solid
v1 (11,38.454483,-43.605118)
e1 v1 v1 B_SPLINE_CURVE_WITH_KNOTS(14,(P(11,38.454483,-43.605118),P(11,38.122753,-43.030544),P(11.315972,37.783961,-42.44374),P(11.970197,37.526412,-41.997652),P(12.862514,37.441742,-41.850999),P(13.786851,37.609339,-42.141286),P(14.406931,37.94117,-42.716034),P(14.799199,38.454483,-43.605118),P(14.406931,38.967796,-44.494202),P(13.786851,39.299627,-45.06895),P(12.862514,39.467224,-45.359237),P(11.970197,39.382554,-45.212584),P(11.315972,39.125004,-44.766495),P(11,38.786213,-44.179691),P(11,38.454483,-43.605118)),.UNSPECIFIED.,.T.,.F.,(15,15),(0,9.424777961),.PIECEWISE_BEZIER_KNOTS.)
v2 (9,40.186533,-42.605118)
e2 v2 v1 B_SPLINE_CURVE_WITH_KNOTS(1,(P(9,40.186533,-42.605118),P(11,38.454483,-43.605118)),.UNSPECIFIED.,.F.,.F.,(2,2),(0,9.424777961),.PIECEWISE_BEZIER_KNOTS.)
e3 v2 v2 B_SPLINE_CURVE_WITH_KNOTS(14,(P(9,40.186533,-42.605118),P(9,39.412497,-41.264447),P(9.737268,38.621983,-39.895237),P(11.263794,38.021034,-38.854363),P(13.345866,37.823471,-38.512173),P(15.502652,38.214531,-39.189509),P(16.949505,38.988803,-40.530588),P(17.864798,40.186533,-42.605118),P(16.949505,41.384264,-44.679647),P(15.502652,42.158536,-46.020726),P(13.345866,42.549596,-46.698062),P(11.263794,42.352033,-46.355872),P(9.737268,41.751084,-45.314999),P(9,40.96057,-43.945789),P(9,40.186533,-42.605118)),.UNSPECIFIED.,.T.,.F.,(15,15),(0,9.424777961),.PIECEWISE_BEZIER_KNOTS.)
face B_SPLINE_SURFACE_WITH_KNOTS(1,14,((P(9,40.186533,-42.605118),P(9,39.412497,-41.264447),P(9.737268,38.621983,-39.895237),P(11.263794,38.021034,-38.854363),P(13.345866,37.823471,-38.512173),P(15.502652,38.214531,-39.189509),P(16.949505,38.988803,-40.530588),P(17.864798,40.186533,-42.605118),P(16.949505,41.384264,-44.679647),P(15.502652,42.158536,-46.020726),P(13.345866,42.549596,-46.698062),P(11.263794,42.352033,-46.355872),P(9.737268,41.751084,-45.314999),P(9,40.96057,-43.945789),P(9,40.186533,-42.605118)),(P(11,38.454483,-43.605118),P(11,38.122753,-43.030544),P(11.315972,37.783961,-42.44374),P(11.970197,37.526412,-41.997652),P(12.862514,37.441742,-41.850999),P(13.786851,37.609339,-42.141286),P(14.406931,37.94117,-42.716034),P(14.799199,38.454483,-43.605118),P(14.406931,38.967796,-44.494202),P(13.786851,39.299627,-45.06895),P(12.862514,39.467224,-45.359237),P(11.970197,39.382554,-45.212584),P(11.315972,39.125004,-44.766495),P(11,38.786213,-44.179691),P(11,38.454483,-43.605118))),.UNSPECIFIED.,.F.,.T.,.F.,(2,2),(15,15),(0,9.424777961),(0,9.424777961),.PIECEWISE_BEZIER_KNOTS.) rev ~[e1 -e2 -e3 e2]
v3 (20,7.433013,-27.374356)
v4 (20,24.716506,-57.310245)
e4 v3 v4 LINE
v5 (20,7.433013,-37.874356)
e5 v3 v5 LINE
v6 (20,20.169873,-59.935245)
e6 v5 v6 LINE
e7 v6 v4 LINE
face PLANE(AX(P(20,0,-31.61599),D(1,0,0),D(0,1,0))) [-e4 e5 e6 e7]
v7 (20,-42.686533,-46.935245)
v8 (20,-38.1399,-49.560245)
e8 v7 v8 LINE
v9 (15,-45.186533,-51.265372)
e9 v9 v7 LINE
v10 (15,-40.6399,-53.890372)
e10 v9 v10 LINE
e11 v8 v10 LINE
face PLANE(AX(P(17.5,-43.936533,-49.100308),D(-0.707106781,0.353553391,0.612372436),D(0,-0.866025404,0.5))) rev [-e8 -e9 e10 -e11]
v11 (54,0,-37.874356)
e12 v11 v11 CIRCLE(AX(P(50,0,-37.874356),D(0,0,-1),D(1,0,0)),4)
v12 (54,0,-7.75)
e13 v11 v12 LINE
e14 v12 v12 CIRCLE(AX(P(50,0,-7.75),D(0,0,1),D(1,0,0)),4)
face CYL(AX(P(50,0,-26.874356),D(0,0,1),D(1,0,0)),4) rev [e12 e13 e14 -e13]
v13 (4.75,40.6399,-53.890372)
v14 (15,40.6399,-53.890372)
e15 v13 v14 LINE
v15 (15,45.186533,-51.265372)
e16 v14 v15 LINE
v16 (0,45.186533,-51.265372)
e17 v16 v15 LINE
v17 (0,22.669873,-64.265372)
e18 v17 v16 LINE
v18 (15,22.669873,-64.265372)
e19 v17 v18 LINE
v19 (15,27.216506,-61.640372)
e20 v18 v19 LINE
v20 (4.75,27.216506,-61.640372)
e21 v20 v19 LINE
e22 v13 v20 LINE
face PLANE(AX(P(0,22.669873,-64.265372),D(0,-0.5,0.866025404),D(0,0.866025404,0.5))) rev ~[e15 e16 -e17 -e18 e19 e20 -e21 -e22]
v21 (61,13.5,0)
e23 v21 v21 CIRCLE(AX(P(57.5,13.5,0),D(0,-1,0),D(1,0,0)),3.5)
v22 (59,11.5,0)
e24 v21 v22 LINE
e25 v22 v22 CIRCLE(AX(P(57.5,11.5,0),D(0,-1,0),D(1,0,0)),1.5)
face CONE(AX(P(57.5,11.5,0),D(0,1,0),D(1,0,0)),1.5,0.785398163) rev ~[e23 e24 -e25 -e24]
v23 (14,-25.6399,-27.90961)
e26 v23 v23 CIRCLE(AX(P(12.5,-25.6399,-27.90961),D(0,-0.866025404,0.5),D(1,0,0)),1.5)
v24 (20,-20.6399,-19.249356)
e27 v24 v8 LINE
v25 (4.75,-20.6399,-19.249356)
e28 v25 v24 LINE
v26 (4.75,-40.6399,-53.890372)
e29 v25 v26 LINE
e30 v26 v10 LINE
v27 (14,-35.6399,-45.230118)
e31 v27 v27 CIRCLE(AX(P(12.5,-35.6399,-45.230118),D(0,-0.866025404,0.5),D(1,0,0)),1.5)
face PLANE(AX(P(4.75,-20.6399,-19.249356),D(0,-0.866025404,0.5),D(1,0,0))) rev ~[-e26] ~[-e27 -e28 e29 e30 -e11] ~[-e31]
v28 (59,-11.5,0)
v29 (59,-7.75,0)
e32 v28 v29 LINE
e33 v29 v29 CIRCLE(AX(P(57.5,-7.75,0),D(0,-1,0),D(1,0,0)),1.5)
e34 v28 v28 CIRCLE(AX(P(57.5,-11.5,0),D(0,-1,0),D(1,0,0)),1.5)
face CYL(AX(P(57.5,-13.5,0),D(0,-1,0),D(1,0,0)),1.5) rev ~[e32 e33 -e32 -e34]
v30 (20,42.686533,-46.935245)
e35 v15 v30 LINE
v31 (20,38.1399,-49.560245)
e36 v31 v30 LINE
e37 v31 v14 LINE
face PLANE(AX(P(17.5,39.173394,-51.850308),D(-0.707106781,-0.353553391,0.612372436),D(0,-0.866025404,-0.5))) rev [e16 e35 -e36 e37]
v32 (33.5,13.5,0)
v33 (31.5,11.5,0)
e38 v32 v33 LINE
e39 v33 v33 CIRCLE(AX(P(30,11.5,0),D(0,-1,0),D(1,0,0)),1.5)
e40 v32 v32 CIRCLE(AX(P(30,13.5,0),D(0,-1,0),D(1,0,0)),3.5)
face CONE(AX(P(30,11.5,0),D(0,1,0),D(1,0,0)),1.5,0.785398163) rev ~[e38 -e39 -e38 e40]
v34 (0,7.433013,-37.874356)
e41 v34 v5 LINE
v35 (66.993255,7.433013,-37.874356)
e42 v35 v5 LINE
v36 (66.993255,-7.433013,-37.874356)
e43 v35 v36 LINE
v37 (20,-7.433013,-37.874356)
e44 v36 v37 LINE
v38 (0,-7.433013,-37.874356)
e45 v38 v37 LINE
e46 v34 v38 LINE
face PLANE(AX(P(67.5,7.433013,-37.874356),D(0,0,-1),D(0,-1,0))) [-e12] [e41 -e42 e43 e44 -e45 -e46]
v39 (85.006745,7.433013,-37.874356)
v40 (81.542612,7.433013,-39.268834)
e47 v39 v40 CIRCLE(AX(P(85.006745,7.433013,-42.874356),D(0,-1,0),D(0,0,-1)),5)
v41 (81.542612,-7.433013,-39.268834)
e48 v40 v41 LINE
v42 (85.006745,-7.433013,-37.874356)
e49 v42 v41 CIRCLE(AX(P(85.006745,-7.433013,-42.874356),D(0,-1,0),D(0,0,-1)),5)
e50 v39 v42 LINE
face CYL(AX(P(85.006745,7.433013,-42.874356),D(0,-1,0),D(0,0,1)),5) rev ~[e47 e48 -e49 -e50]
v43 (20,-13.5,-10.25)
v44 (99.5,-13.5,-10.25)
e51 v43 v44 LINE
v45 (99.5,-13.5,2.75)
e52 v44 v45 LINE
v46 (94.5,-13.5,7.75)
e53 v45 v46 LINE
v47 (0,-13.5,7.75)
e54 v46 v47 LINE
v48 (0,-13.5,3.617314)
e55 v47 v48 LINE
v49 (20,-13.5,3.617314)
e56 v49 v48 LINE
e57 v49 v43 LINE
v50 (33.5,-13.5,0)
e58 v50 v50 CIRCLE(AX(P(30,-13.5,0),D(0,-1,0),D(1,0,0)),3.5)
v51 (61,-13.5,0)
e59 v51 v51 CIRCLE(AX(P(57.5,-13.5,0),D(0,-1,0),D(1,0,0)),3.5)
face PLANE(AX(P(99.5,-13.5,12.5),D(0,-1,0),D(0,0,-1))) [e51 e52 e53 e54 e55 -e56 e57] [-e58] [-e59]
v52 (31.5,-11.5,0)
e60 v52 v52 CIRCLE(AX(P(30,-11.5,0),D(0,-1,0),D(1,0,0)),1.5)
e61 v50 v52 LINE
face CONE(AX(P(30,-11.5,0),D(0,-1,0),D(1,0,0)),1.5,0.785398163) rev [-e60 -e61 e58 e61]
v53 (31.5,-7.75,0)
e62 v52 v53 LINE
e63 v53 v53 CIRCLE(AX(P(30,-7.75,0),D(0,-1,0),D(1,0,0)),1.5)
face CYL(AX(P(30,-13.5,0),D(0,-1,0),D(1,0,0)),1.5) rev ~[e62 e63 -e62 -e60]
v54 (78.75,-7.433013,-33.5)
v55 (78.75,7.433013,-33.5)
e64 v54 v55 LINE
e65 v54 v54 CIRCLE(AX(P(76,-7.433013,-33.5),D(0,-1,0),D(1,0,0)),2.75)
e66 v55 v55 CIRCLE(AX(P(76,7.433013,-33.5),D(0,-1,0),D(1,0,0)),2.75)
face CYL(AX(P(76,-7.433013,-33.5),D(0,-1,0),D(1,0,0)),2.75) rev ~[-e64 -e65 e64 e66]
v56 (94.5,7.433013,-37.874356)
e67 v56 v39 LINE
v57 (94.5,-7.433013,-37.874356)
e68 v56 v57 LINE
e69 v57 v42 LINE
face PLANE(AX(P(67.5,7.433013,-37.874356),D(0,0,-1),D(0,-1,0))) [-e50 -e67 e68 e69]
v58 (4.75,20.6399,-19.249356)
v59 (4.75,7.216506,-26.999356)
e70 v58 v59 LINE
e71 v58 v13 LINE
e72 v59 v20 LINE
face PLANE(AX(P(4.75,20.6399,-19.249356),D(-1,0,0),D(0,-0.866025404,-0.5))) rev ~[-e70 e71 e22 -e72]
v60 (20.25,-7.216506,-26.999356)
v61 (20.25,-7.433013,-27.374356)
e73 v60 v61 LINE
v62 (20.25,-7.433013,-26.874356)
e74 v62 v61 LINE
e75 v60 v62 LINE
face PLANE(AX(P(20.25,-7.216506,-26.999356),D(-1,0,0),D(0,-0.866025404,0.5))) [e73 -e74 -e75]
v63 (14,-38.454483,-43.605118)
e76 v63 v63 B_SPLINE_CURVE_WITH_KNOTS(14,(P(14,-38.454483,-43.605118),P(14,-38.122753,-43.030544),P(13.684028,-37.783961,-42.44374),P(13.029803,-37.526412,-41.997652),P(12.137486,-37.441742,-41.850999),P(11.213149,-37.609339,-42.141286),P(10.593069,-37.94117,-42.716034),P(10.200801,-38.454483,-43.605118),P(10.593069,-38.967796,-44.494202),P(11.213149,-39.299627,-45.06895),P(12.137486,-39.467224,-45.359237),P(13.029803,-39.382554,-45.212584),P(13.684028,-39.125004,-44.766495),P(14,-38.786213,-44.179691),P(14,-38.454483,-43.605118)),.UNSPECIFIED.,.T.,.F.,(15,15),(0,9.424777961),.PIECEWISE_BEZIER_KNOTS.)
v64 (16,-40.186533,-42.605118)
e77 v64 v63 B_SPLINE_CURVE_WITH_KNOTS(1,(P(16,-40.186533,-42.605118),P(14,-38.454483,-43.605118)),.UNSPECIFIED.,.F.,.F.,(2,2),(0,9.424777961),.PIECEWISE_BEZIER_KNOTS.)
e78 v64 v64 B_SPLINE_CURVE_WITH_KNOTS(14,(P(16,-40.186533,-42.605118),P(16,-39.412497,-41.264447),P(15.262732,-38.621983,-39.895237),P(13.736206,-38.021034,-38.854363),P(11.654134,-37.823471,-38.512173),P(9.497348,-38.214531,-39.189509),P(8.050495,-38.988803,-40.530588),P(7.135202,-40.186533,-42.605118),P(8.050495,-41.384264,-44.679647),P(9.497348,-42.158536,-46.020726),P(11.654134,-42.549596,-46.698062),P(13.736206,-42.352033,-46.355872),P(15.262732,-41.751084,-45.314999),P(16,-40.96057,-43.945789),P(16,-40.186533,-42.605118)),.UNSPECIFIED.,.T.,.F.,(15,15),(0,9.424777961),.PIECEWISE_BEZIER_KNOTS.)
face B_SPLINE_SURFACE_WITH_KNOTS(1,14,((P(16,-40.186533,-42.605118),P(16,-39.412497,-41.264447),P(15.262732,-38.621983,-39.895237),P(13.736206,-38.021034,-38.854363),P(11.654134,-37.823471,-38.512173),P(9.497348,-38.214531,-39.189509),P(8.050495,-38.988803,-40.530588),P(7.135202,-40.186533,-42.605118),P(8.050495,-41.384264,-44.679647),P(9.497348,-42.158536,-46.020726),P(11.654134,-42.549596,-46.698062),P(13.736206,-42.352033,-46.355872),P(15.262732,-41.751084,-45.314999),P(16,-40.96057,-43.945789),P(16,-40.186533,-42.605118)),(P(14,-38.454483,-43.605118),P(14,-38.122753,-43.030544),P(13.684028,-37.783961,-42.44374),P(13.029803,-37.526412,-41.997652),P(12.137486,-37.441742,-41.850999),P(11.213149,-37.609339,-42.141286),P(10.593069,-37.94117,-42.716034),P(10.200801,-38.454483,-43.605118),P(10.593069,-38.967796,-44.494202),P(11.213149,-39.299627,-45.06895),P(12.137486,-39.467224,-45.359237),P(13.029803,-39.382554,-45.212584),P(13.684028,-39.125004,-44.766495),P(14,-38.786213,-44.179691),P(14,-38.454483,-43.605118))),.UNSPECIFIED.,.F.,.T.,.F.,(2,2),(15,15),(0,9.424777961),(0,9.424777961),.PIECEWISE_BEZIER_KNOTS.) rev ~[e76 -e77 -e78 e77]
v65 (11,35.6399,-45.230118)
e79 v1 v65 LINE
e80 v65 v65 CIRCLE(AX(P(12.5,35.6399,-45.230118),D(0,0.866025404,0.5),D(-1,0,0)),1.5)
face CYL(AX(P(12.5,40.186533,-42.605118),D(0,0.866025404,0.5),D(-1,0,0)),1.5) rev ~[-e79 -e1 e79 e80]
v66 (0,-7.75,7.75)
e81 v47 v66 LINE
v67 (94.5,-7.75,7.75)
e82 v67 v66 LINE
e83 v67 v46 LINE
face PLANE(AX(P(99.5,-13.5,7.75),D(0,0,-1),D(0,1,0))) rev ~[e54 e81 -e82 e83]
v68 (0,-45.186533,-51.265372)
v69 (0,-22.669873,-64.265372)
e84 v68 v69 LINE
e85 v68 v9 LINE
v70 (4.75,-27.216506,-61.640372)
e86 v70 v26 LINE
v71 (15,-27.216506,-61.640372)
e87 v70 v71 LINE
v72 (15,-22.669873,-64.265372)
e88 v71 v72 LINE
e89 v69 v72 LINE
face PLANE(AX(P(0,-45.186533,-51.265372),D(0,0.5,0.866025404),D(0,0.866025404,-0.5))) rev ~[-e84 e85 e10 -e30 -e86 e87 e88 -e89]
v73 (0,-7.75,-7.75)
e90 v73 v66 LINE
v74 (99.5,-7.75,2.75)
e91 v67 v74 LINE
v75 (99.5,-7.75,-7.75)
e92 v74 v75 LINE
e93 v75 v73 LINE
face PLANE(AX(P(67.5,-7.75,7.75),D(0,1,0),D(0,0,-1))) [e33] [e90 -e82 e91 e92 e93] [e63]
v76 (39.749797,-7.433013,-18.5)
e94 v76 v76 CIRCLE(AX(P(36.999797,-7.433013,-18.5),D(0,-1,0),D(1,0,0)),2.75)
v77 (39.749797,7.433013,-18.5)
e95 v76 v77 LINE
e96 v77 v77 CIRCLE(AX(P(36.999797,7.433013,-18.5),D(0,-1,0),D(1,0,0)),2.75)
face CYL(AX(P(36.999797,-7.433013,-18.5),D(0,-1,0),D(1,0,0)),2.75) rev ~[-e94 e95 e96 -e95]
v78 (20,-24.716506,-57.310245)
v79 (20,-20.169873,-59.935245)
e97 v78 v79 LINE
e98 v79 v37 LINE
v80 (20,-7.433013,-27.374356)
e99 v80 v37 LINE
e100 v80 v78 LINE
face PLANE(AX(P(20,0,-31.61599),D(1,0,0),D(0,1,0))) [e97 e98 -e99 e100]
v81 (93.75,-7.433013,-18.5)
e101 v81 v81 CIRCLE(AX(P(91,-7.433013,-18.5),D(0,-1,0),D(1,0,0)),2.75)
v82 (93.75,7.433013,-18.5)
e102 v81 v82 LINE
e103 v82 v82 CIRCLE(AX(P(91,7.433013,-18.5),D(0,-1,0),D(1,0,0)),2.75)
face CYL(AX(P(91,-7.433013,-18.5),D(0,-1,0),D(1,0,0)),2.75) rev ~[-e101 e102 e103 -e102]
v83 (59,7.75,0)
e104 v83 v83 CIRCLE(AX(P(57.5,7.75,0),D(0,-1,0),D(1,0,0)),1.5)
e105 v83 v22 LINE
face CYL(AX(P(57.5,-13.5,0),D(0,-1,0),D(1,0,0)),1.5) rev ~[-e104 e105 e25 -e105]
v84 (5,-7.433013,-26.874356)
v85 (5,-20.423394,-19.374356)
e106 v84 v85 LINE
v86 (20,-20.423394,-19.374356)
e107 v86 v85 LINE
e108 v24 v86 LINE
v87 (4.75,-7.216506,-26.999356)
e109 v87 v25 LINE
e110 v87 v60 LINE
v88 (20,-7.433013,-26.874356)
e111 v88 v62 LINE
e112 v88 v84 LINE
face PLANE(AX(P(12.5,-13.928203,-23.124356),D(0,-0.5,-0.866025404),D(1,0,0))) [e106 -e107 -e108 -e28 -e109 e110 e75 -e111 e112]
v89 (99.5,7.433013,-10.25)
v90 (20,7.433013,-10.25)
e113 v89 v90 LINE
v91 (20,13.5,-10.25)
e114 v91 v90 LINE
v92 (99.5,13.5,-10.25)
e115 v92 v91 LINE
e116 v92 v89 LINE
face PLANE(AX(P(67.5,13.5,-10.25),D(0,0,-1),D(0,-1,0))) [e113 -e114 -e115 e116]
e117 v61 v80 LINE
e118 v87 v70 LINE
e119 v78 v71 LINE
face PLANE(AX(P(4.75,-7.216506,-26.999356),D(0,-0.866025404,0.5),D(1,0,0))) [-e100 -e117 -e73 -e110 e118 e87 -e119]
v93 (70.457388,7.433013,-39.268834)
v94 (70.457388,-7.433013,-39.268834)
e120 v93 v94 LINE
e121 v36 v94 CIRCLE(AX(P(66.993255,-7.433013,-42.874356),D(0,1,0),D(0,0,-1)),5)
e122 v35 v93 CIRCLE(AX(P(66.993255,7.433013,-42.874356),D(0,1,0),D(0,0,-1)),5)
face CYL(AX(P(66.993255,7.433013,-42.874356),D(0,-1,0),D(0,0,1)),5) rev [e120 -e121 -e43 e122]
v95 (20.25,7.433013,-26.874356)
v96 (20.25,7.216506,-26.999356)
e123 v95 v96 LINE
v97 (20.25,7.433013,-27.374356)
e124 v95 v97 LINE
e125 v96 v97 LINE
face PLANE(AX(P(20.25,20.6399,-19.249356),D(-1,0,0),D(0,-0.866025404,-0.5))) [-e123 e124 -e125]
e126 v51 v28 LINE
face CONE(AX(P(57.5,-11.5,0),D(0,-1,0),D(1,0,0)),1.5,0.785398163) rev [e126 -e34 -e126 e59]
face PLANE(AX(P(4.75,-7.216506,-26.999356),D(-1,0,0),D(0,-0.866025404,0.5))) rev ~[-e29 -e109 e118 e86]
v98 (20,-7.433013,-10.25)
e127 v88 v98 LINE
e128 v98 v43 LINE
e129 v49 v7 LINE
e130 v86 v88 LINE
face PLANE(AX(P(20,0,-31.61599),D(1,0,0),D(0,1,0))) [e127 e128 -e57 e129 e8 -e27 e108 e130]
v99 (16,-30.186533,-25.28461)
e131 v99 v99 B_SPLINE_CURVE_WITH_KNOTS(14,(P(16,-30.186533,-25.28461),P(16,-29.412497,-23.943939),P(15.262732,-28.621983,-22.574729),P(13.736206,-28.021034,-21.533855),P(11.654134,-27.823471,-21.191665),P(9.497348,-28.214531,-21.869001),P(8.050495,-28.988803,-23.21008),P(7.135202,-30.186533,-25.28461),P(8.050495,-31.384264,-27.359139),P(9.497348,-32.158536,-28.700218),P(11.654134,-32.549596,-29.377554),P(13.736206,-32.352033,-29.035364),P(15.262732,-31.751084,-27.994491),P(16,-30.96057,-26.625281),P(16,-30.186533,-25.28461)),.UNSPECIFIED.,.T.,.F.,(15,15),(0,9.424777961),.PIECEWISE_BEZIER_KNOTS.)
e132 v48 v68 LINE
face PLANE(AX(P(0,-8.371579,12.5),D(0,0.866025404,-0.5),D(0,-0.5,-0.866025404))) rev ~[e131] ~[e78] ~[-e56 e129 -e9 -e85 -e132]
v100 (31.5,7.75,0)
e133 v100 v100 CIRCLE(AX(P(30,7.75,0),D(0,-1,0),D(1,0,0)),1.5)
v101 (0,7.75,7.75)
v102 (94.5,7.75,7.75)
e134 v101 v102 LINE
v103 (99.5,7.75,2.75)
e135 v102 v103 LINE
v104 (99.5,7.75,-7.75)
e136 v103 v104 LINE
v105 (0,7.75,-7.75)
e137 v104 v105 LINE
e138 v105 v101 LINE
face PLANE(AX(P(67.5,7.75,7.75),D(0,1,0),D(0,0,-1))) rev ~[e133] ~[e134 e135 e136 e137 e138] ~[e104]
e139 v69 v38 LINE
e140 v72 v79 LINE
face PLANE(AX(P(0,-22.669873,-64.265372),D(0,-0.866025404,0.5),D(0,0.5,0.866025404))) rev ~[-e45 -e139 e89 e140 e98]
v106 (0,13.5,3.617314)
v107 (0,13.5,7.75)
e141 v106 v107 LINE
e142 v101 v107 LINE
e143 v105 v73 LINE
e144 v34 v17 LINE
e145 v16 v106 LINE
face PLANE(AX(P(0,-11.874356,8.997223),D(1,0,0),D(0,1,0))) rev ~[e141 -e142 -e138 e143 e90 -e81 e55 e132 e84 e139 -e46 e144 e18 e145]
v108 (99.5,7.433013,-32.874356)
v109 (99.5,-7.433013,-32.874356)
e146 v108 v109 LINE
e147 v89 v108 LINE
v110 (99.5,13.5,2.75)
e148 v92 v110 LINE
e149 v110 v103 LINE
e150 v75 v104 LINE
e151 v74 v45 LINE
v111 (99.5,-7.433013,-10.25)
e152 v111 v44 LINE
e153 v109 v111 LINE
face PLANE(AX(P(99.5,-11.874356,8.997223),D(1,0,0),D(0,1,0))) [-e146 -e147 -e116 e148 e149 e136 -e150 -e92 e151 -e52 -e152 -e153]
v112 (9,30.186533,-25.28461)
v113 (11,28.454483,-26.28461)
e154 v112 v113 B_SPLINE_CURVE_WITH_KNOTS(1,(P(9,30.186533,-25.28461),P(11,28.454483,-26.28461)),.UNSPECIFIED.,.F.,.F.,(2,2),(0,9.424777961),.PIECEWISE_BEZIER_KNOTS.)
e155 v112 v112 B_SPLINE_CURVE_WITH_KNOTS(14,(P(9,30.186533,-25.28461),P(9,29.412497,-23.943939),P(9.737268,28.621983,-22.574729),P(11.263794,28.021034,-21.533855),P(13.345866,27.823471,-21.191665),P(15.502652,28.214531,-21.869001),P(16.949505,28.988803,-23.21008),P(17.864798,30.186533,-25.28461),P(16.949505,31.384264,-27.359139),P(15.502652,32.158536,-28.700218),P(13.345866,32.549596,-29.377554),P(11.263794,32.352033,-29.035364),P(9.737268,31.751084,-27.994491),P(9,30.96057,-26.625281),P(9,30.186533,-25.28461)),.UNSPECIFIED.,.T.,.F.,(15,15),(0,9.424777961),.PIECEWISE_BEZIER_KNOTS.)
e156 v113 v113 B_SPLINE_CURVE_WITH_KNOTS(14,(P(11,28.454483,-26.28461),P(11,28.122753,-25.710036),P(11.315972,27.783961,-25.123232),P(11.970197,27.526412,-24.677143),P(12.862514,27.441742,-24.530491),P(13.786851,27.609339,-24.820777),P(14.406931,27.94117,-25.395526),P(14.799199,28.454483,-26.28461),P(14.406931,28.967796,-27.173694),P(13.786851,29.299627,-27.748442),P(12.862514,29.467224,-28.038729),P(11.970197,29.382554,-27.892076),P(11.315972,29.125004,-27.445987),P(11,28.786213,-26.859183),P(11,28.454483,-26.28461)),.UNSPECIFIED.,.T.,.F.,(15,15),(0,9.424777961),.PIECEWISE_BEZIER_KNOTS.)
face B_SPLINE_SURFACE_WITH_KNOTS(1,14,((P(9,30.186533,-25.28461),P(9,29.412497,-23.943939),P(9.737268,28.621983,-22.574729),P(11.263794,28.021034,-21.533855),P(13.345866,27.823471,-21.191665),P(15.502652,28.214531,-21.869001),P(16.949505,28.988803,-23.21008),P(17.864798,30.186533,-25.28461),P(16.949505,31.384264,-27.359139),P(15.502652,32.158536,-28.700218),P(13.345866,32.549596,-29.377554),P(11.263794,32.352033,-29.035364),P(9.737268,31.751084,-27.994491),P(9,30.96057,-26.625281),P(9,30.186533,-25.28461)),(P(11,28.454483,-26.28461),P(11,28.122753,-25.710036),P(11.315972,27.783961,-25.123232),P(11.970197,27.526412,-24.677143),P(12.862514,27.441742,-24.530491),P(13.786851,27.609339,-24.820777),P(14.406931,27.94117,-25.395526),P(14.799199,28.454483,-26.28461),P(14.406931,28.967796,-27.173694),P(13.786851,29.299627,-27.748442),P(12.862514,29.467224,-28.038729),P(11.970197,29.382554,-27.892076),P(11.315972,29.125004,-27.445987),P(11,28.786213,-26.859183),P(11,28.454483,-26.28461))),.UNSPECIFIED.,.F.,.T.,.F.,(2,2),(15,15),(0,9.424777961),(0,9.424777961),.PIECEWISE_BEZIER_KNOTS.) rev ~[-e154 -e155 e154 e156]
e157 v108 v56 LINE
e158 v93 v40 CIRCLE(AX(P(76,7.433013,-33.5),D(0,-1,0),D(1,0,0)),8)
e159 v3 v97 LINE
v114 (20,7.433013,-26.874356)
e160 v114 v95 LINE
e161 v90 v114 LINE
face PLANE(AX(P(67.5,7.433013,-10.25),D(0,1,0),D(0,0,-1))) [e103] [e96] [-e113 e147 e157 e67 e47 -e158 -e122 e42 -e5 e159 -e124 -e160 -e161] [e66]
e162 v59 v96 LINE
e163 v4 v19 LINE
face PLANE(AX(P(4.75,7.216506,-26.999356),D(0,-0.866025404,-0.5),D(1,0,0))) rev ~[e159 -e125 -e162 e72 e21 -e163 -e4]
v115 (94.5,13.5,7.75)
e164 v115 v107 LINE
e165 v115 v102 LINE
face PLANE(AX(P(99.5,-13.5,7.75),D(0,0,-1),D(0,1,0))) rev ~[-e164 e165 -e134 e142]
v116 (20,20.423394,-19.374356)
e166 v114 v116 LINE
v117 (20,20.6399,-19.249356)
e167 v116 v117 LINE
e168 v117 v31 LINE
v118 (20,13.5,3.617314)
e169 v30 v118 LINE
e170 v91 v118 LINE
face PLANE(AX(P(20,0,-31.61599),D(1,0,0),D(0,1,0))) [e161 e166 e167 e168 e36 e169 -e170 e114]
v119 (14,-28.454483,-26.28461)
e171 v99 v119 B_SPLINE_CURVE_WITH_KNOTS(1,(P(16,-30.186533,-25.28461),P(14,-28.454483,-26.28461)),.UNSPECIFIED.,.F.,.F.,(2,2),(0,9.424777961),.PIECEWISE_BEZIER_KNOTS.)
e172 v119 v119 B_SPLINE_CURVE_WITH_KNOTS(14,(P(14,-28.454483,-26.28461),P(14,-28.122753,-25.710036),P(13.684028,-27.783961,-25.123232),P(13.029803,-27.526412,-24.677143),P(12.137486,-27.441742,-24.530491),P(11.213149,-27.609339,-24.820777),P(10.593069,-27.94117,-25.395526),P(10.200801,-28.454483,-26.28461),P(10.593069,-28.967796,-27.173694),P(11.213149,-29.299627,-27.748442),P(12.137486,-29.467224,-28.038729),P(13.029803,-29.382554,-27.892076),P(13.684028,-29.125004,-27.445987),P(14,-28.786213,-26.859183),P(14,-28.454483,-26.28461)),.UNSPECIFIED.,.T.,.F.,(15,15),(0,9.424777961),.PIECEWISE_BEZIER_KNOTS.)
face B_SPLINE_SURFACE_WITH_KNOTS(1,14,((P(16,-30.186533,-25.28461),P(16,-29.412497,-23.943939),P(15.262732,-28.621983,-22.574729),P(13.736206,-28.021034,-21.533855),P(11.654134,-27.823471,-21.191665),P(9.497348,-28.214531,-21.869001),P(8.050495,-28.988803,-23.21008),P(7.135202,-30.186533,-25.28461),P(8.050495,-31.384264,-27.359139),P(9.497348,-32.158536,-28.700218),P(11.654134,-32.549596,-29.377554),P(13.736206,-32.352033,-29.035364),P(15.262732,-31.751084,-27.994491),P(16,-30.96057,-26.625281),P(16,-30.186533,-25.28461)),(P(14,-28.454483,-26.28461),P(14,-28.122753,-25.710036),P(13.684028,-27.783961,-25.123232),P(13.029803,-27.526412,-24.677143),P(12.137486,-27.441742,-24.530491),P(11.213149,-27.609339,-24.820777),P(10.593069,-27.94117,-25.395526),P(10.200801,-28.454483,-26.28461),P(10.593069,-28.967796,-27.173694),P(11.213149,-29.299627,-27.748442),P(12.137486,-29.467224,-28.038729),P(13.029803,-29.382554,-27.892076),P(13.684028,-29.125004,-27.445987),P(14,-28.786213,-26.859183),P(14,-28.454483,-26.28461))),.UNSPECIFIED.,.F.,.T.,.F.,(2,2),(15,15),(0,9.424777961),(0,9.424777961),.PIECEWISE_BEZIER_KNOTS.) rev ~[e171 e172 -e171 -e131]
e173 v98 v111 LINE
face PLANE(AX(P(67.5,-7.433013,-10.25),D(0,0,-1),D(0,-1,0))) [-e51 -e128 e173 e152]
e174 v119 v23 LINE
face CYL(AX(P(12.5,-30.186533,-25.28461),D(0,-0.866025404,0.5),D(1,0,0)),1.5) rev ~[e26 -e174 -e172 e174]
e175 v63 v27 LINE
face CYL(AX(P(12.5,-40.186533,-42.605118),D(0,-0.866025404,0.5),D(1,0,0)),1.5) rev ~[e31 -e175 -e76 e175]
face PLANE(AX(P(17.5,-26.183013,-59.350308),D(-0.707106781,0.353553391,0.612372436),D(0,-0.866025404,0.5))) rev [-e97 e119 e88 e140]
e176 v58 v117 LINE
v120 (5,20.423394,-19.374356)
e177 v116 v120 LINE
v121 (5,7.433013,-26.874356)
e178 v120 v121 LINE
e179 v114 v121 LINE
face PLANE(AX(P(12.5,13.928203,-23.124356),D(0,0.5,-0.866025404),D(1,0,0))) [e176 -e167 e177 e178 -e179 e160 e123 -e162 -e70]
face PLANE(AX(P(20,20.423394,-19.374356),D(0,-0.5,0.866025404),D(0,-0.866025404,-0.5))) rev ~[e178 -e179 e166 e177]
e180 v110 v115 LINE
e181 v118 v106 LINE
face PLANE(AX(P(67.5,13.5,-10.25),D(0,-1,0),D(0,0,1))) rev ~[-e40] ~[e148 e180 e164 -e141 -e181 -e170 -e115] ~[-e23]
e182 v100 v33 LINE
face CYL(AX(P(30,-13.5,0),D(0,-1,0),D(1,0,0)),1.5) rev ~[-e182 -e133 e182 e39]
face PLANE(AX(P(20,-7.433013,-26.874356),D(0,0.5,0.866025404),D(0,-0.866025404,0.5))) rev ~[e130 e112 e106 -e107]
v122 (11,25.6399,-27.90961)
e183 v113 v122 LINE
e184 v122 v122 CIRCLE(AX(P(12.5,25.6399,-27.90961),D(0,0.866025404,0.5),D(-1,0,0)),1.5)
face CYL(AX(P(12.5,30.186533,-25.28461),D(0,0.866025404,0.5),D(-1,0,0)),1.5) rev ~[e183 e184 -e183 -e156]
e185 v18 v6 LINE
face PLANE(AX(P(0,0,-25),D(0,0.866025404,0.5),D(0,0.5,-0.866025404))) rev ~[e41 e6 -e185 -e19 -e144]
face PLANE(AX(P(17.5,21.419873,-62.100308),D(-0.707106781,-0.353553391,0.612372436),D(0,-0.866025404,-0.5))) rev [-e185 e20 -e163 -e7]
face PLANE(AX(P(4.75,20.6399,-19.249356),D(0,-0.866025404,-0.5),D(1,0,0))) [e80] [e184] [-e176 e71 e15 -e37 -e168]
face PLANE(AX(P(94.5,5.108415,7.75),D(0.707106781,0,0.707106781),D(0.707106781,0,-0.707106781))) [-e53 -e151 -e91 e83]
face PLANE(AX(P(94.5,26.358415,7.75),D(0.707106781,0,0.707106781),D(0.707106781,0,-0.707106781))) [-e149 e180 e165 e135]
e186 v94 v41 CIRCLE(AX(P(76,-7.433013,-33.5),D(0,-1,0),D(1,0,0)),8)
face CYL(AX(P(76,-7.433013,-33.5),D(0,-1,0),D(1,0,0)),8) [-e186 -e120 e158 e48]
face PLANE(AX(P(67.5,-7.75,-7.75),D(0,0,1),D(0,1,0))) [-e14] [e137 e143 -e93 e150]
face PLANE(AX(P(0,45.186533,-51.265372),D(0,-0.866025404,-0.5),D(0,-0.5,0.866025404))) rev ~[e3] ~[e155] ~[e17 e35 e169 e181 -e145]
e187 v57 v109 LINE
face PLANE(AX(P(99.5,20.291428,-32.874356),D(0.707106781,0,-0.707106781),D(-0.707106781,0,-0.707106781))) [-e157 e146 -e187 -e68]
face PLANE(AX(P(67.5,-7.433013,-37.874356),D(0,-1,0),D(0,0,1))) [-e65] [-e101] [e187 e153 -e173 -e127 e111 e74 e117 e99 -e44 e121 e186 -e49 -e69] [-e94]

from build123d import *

# Parameters (mm, degrees)
F0_W         = 15
F0_H         = 15
F1_DEPTH     = 20
F3_DEPTH     = 15
F4_R         = 1.5
F5_DEPTH     = 5.5
F6_R         = 1.5
F7_DEPTH     = 5.5
F8_W         = 15
F8_H         = 15
F9_DEPTH     = 47.5
F10_R        = 4
F11_DEPTH    = 19.374355653
F13_DEPTH    = 47.5
F14_R        = 2.75
F15_DEPTH    = 52.6205461814
F16_DEPTH    = 20
F17_W        = 67.5
F17_H        = 14.8660254038
F17_R        = 4
F18_DEPTH    = 11
F19_W        = 14.8660254038
F19_H        = 26.3910161514
F20_DEPTH    = 67.501
F21_SIZE     = 5
F22_R        = 1.5
F23_DEPTH    = 58.6875334795
F24_W        = 15.5
F24_H        = 15.5
F25_DEPTH    = 67.501
F26_W        = 15.5
F26_H        = 15.5
F27_DEPTH    = 51.2593302492
F28_W        = 15.5
F28_H        = 15.5
F29_DEPTH    = 51.2593302492
F30_DEPTH    = 32
F31_R        = 2.75
F32_DEPTH    = 52.6205461814
F33_R        = 8
F33_R_2      = 2.75
F34_DEPTH    = 14.8660254038
F36_DEPTH    = 99.5
F37_W        = 27
F37_H        = 4.75
F38_DEPTH    = 99.501
F39_T1_DEPTH = 40.5828552834
F39_T3_DEPTH = 31.4668298797
F39_T5_DEPTH = 31.4668298797
F40_R        = 5
F41_SIZE     = 2


# Not quite as in the source:
# - a fillet or chamfer that OpenCascade refuses, or shapes differently, is made with other operations: its cross-section is extruded or revolved along the edge and cut away or added
# - an extrude ends at something that could not be found from the text; its depth is read off the source's solid


with BuildPart() as f1:
    # F0 (on Right) → F1 (new body)
    with BuildSketch(Plane.YZ):
        Polygon((45.1865334795, -51.2653718044), (8.3715789032, 12.5), (-8.3715789032, 12.5), (-45.1865334795, -51.2653718044), (-22.6698729811, -64.2653718044), (0, -25), (22.6698729811, -64.2653718044), align=None)
        Rectangle(F0_W, F0_H, mode=Mode.SUBTRACT)
    extrude(amount=F1_DEPTH)

    # F2 (on face) → F3 (cut)
    with BuildSketch(Plane.YZ.offset(20)):
        Polygon((-20.4233937587, -19.374355653), (-40.4233937587, -54.0153718044), (-27.4330127019, -61.5153718044), (-7.4330127019, -26.874355653), align=None)
        Polygon((27.4330127019, -61.5153718044), (40.4233937587, -54.0153718044), (20.4233937587, -19.374355653), (7.4330127019, -26.874355653), align=None)
    extrude(amount=-F3_DEPTH, mode=Mode.SUBTRACT)

    # F4 (on face) → F5 (cut, through all)
    with BuildSketch(Plane(origin=(0, -11.6913429511, 6.75), x_dir=(1, 0, 0), z_dir=(0, -0.8660254038, 0.5))):
        with Locations((12.5, -36.9903810568)):
            Circle(F4_R)
        with Locations((12.5, -56.9903810568)):
            Circle(F4_R)
    extrude(amount=-F5_DEPTH, mode=Mode.SUBTRACT)

    # F6 (on face) → F7 (cut, through all)
    with BuildSketch(Plane(origin=(0, 11.6913429511, 6.75), x_dir=(-1, 0, 0), z_dir=(0, 0.8660254038, 0.5))):
        with Locations((-12.5, -56.9903810568)):
            Circle(F6_R)
        with Locations((-12.5, -36.9903810568)):
            Circle(F6_R)
    extrude(amount=-F7_DEPTH, mode=Mode.SUBTRACT)

    # F8 (on face) → F9 (join)
    with BuildSketch(Plane.YZ.offset(20)):
        Polygon((8.3715789032, 12.5), (-8.3715789032, 12.5), (-13.5, 3.6173140978), (-13.5, -23.3715789032), (-7.4330127019, -26.874355653), (7.4330127019, -26.874355653), (13.5, -23.3715789032), (13.5, 3.6173140978), align=None)
        Rectangle(F8_W, F8_H, mode=Mode.SUBTRACT)
    extrude(amount=F9_DEPTH)

    # F10 (on face) → F11 (cut, through all)
    with BuildSketch(Plane(origin=(0, 0, -26.874355653), x_dir=(1, 0, 0), z_dir=(0, 0, -1))):
        with Locations((50, 0)):
            Circle(F10_R)
    extrude(amount=-F11_DEPTH, mode=Mode.SUBTRACT)

    # F12 (on face) → F13 (cut, through all)
    with BuildSketch(Plane.YZ.offset(67.5)):
        Polygon((-13.5, -23.3715789032), (-7.4330127019, -26.874355653), (-7.4330127019, -10.25), (-13.5, -10.25), align=None)
        Polygon((7.4330127019, -10.25), (7.4330127019, -26.874355653), (13.5, -23.3715789032), (13.5, -10.25), align=None)
    extrude(amount=-F13_DEPTH, mode=Mode.SUBTRACT)

    # F14 (on face) → F15 (cut, through all)
    with BuildSketch(Plane.XZ.offset(7.4330127019)):
        with Locations((36.9997965198, -18.5)):
            Circle(F14_R)
    extrude(amount=-F15_DEPTH, mode=Mode.SUBTRACT)

    # F16 (add, through all): a face of the model
    f16_faces = [f1.faces().sort_by_distance(p)[0] for p in [
        (20, 0, -26.2495704353),
    ]]
    extrude(f16_faces, amount=F16_DEPTH)

    # F17 (on face) → F18 (join, through all)
    with BuildSketch(Plane(origin=(0, 0, -26.874355653), x_dir=(1, 0, 0), z_dir=(0, 0, -1))):
        with Locations((33.75, 0)):
            Rectangle(F17_W, F17_H)
        with Locations((50, 0)):
            Circle(F17_R, mode=Mode.SUBTRACT)
    extrude(amount=F18_DEPTH)

    # F19 (on face) → F20 (cut, through all)
    with BuildSketch(Plane(origin=(0, 0, 0), x_dir=(0, -1, 0), z_dir=(-1, 0, 0))):
        with Locations((0, -51.0698637287)):
            Rectangle(F19_W, F19_H)
    extrude(amount=-F20_DEPTH, mode=Mode.SUBTRACT)

    # F21
    f21_edges = [f1.edges().sort_by_distance(p)[0] for p in [
        (20, -42.804964, -52.640372),
        (20, -25.051443, -62.890372),
        (20, 25.051443, -62.890372),
        (20, 42.804964, -52.640372),
    ]]
    chamfer(f21_edges, length=F21_SIZE)

    # F22 (on face) → F23 (cut, through all)
    with BuildSketch(Plane.XZ.offset(13.5)):
        with Locations((30, 0)):
            Circle(F22_R)
        with Locations((57.5, 0)):
            Circle(F22_R)
    extrude(amount=-F23_DEPTH, mode=Mode.SUBTRACT)

    # F24 (on face) → F25 (cut, through all)
    with BuildSketch(Plane(origin=(0, 0, 0), x_dir=(0, -1, 0), z_dir=(-1, 0, 0))):
        Rectangle(F24_W, F24_H)
    extrude(amount=-F25_DEPTH, mode=Mode.SUBTRACT)

    # F26 (on face) → F27 (cut, through all)
    with BuildSketch(Plane(origin=(0, -13.4951905284, -23.374355653), x_dir=(1, 0, 0), z_dir=(0, -0.5, -0.8660254038))):
        with Locations((12.5, 0.5)):
            Rectangle(F26_W, F26_H)
    extrude(amount=F27_DEPTH, mode=Mode.SUBTRACT)

    # F28 (on face) → F29 (cut, through all)
    with BuildSketch(Plane(origin=(0, 13.4951905284, -23.374355653), x_dir=(1, 0, 0), z_dir=(0, 0.5, -0.8660254038))):
        with Locations((12.5, -0.5)):
            Rectangle(F28_W, F28_H)
    extrude(amount=F29_DEPTH, mode=Mode.SUBTRACT)

    # F30 (add): a face of the model
    f30_faces = [f1.faces().sort_by_distance(p)[0] for p in [
        (67.5, 0, -13.0224065519),
    ]]
    extrude(f30_faces, amount=F30_DEPTH)

    # F31 (on face) → F32 (cut, through all)
    with BuildSketch(Plane.XZ.offset(7.4330127019)):
        with Locations((91, -18.5)):
            Circle(F31_R)
        with Locations((76, -33.5)):
            Circle(F31_R)
    extrude(amount=-F32_DEPTH, mode=Mode.SUBTRACT)

    # F33 (on face) → F34 (join, through all)
    with BuildSketch(Plane.XZ.offset(7.4330127019)):
        with Locations((76, -33.5)):
            Circle(F33_R)
        with Locations((76, -33.5)):
            Circle(F33_R_2, mode=Mode.SUBTRACT)
    extrude(amount=-F34_DEPTH)

    # F35 (on face) → F36 (join, through all)
    with BuildSketch(Plane.YZ.offset(99.5)):
        Polygon((-13.5, 3.6173140978), (-8.3715789032, 12.5), (-13.5, 12.5), align=None)
        Polygon((13.5, 12.5), (8.3715789032, 12.5), (13.5, 3.6173140978), align=None)
    extrude(amount=-F36_DEPTH)

    # F37 (on face) → F38 (cut, through all)
    with BuildSketch(Plane.YZ.offset(99.5)):
        with Locations((0, 10.125)):
            Rectangle(F37_W, F37_H)
    extrude(amount=-F38_DEPTH, mode=Mode.SUBTRACT)

    # F39: chamfer of 5 on 5 edges, made by hand

    # F39_s2 → F39_t1 (cut)
    with BuildSketch(Plane.XZ.offset(-20.2914276417)):
        Polygon((99.5, -32.874355653), (94.5, -37.874355653), (99.5, -37.874355653), align=None)
    extrude(amount=F39_T1_DEPTH, mode=Mode.SUBTRACT)

    # F39_s4 → F39_t3 (cut)
    with BuildSketch(Plane.XZ.offset(-5.1084149398)):
        Polygon((94.5, 7.75), (99.5, 2.75), (99.5, 7.75), align=None)
    extrude(amount=F39_T3_DEPTH, mode=Mode.SUBTRACT)

    # F39_s6 → F39_t5 (cut)
    with BuildSketch(Plane.XZ.offset(-26.3584149398)):
        Polygon((94.5, 7.75), (99.5, 2.75), (99.5, 7.75), align=None)
    extrude(amount=F39_T5_DEPTH, mode=Mode.SUBTRACT)

    # F40
    f40_edges = [f1.edges().sort_by_distance(p)[0] for p in [
        (69.301865, 0, -37.874356),
        (82.698135, 0, -37.874356),
    ]]
    fillet(f40_edges, radius=F40_R)

    # F41
    f41_edges = [f1.edges().sort_by_distance(p)[0] for p in [
        (28.5, -13.5, 0),
        (56, -13.5, 0),
        (11, -30.186533, -25.28461),
        (11, -40.186533, -42.605118),
        (56, 13.5, 0),
        (28.5, 13.5, 0),
        (14, 30.186533, -25.28461),
        (14, 40.186533, -42.605118),
    ]]
    chamfer(f41_edges, length=F41_SIZE)


solid = f1.part
